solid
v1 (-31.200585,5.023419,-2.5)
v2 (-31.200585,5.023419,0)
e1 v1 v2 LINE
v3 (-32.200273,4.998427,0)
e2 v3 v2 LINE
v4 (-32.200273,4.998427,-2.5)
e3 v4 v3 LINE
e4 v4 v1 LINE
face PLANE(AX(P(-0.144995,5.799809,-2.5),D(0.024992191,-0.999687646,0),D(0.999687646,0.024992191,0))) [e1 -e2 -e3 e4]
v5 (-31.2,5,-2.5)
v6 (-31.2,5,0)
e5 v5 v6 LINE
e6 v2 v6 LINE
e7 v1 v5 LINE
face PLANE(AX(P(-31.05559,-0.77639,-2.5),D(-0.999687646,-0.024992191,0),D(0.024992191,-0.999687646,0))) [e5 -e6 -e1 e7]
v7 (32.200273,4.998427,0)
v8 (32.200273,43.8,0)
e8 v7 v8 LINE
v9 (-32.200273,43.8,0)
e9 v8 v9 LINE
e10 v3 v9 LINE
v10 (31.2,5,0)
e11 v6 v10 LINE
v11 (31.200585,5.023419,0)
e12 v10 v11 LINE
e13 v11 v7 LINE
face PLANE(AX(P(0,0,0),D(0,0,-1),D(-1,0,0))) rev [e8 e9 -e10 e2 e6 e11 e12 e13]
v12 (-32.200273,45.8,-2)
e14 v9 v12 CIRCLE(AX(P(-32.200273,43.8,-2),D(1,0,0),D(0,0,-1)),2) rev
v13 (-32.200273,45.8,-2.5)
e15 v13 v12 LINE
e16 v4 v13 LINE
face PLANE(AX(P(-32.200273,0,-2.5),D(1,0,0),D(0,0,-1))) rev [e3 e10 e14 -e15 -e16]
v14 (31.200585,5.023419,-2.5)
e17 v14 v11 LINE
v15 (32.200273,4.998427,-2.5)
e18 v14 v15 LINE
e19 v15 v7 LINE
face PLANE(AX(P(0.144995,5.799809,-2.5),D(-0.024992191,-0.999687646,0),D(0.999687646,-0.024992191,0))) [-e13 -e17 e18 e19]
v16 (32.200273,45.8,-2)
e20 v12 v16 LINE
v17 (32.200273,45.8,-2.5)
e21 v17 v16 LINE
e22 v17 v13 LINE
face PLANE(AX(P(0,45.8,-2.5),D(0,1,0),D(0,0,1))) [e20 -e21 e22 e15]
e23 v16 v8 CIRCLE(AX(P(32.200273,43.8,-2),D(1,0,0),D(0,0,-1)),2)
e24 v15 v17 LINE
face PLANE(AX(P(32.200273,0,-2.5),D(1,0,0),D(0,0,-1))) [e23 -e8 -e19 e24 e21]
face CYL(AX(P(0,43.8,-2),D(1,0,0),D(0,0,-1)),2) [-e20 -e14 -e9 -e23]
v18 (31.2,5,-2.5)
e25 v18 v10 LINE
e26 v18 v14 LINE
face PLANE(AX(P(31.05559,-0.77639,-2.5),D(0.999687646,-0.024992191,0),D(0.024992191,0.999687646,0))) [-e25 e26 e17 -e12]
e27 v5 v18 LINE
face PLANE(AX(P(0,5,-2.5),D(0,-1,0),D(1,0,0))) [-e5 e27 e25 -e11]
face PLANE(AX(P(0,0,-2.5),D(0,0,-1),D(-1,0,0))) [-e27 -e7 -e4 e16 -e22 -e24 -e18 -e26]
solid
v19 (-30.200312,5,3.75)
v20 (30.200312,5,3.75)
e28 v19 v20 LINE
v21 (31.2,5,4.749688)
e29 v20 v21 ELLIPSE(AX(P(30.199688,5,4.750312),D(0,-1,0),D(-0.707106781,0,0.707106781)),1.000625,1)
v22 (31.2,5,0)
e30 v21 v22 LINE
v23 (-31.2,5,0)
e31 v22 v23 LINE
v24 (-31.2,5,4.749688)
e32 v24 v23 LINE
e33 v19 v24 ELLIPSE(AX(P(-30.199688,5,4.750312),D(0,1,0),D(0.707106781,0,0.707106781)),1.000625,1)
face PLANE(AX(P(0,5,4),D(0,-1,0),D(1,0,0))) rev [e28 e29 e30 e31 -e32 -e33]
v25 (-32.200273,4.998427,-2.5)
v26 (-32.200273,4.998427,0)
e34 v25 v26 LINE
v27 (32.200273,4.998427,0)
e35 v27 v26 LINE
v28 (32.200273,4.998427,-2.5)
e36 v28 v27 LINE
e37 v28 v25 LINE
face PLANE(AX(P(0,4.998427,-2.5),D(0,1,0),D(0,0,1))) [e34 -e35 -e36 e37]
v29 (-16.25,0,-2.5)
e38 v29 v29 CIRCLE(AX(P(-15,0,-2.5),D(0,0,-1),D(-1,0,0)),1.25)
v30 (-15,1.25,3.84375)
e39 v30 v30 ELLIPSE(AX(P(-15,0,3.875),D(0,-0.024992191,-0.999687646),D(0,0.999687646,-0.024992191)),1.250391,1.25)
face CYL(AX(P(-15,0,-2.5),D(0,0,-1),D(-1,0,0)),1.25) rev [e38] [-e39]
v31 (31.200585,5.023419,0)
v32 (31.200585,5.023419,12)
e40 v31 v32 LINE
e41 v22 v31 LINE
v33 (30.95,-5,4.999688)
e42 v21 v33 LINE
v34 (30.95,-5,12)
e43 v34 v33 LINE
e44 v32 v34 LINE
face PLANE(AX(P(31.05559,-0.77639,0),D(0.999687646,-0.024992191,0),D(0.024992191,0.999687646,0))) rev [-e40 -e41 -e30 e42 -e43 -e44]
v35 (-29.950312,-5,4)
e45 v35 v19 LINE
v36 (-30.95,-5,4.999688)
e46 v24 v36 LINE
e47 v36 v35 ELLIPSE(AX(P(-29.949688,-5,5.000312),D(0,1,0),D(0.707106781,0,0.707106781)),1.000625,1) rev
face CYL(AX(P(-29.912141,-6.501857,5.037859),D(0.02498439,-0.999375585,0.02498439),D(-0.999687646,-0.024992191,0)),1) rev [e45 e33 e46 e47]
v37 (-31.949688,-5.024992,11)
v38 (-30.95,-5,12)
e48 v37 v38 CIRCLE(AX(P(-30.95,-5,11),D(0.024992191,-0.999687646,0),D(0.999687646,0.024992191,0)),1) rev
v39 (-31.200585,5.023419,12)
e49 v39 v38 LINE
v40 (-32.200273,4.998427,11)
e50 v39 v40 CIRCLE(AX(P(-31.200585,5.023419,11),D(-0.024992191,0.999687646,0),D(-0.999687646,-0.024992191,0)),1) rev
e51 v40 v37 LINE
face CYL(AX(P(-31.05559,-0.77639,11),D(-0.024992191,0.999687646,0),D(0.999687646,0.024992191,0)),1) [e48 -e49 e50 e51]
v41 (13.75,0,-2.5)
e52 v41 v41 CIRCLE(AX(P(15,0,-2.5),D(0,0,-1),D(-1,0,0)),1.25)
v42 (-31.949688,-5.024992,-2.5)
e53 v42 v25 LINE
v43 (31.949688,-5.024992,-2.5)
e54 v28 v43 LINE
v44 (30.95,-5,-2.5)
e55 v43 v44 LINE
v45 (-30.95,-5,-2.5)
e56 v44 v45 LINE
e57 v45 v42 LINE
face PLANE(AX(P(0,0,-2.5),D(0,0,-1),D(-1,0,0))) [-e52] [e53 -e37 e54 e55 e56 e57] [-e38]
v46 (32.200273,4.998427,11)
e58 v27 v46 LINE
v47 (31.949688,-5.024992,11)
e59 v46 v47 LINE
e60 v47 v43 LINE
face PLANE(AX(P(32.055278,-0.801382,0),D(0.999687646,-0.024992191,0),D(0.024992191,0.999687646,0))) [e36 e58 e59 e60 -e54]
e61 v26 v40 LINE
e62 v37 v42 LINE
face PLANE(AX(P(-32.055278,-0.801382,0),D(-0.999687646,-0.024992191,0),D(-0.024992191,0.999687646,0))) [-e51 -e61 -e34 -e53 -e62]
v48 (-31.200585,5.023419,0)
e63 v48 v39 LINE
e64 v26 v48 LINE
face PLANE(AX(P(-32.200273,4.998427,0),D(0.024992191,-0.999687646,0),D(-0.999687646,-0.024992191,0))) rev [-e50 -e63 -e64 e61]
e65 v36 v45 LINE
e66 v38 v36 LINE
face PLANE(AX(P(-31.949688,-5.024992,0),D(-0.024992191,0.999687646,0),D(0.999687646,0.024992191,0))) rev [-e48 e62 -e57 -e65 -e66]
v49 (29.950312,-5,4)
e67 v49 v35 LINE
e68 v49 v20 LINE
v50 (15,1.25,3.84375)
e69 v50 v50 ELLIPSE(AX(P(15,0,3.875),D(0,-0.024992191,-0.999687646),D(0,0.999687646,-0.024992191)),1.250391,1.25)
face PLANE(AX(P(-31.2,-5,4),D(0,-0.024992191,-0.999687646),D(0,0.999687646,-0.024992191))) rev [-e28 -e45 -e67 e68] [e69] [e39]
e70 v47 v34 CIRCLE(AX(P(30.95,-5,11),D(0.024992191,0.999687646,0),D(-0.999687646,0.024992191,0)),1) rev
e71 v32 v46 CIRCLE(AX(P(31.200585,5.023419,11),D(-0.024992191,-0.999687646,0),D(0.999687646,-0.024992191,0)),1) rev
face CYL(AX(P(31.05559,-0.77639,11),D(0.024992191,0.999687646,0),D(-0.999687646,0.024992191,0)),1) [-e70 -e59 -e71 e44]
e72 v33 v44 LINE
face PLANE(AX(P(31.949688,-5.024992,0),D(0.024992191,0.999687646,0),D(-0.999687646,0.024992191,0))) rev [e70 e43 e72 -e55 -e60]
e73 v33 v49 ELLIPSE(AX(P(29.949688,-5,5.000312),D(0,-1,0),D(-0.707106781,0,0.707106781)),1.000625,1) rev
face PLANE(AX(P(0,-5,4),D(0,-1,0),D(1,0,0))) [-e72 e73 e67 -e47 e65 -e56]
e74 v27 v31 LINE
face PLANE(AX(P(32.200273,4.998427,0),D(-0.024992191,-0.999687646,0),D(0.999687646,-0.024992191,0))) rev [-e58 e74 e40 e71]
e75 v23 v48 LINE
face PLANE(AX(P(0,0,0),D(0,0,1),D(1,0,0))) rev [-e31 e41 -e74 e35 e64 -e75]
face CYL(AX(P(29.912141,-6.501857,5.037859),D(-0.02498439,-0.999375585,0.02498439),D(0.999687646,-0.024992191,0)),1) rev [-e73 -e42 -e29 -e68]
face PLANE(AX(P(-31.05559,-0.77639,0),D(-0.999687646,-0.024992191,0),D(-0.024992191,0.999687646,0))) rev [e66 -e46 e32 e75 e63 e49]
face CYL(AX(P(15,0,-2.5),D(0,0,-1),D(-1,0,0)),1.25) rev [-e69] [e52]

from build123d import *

# Parameters (mm, degrees)
BOSS_EXTRUDE1_DEPTH                  = 4
CUT_EXTRUDE1_DEPTH                   = 32.850274724
CUT_EXTRUDE1_DEPTH_BACK              = 32.850274724
SKETCH3_W                            = 12
SKETCH3_H                            = 10.026550622
BOSS_EXTRUDE2_DEPTH                  = 1
FILLET1_R                            = 1
BOSS_EXTRUDE3_DEPTH                  = 2.5
FILLET2_R                            = 2
SKETCH11_W                           = 1.25
SKETCH11_H                           = 14.5
TAP_DRILL_FOR_M3X0_5_TAP3_AT_2_COUNT = 2
TAP_DRILL_FOR_M3X0_5_TAP3_AT_2_PITCH = 30


with BuildPart() as part:
    # Sketch1 → Boss-Extrude1 (new body)
    with BuildSketch(Plane.XY):
        Polygon((-30.95, -5), (0, -5), (0, 5), (-31.2, 5), align=None)
        Polygon((0, 5), (0, -5), (30.95, -5), (31.2, 5), align=None)
    extrude(amount=BOSS_EXTRUDE1_DEPTH)

    # Sketch2 → Cut-Extrude1 (cut, two sides: drawn at the far end of the back side and taken through both)
    with BuildSketch(Plane(origin=(0, 0, 0), x_dir=(0, 0, -1), z_dir=(1, 0, 0)).offset(-CUT_EXTRUDE1_DEPTH_BACK)):
        Polygon((-4, -5), (-3.75, 5), (-4, 5), align=None)
    extrude(amount=CUT_EXTRUDE1_DEPTH + CUT_EXTRUDE1_DEPTH_BACK, mode=Mode.SUBTRACT)

    # Sketch3 → Boss-Extrude2 (add)
    with BuildSketch(Plane(origin=(31.055590256, -0.776389756, 0), x_dir=(0, 0, -1), z_dir=(0.9996876464081229, -0.02499219116020312, 0))):
        with Locations((-6, 0.788345395)):
            Rectangle(SKETCH3_W, SKETCH3_H)
    extrude(amount=BOSS_EXTRUDE2_DEPTH)

    # Fillet1
    fillet1_edges = [part.edges().sort_by_distance(p)[0] for p in [
        (31.075, 0, 3.875),
        (32.074980381, -0.013282795, 12),
    ]]
    fillet(fillet1_edges, radius=FILLET1_R - 0.0001)  # a hair under: the kernel refuses the full size

    # Mirror1: part across plane


with BuildPart() as part_1:
    add(part.part)
    add(part.part.mirror(Plane(origin=(0, 0, 0), x_dir=(0, 0, 1), z_dir=(1, 0, 0))))

    # Sketch4 → Boss-Extrude3 (add)
    with BuildSketch(Plane(origin=(0, 0, 0), x_dir=(-1, 0, 0), z_dir=(0, 0, -1))):
        Polygon((-32.200273116, 45.8), (-32.200273116, 4.998426601), (-31.20058547, 5.023418793), (-31.2, 5), (31.2, 5), (31.20058547, 5.023418793), (32.200273116, 4.998426601), (32.200273116, 45.8), align=None)
        Polygon((32.200273116, 4.998426601), (-32.200273116, 4.998426601), (-31.949687646, -5.024992191), (-30.95, -5), (30.95, -5), (31.949687646, -5.024992191), align=None)
    extrude(amount=BOSS_EXTRUDE3_DEPTH)


with BuildPart() as boss_extrude3_piece_1:
    # of the separate pieces the step leaves, piece 1, a body of its own (boss_extrude3_pieces)
    add(part_1.part.solids().sort_by_distance((32.200273116, 45.8, 0))[0])

    # Fillet2
    fillet2_edges = [boss_extrude3_piece_1.edges().sort_by_distance(p)[0] for p in [
        (0, 45.8, 0),
    ]]
    fillet(fillet2_edges, radius=FILLET2_R)


with BuildPart() as boss_extrude3_piece_2:
    # of the separate pieces the step leaves, piece 2, a body of its own (boss_extrude3_pieces)
    add(part_1.part.solids().sort_by_distance((-30.200412322, 5, 3.75))[0])

    # Sketch11 → Tap Drill for M3x0.5 Tap3 (revolve, cut)
    with BuildSketch(Plane(origin=(15, 0, -2.5), x_dir=(0, 1, 0), z_dir=(1, 0, 0))):
        with Locations((0.625, 7.25)):
            Rectangle(SKETCH11_W, SKETCH11_H)
    tap_drill_for_m3x0_5_tap3 = revolve(axis=Axis((15, 0, -8.85), (0, 0, 1)), mode=Mode.SUBTRACT)

    # Tap Drill for M3x0.5 Tap3 at 2: Tap Drill for M3x0.5 Tap3 ×2
    with Locations(*[(-i * TAP_DRILL_FOR_M3X0_5_TAP3_AT_2_PITCH, 0, 0) for i in range(1, TAP_DRILL_FOR_M3X0_5_TAP3_AT_2_COUNT)]):
        add(tap_drill_for_m3x0_5_tap3, mode=Mode.SUBTRACT)


solid = Compound([boss_extrude3_piece_1.part, boss_extrude3_piece_2.part])
